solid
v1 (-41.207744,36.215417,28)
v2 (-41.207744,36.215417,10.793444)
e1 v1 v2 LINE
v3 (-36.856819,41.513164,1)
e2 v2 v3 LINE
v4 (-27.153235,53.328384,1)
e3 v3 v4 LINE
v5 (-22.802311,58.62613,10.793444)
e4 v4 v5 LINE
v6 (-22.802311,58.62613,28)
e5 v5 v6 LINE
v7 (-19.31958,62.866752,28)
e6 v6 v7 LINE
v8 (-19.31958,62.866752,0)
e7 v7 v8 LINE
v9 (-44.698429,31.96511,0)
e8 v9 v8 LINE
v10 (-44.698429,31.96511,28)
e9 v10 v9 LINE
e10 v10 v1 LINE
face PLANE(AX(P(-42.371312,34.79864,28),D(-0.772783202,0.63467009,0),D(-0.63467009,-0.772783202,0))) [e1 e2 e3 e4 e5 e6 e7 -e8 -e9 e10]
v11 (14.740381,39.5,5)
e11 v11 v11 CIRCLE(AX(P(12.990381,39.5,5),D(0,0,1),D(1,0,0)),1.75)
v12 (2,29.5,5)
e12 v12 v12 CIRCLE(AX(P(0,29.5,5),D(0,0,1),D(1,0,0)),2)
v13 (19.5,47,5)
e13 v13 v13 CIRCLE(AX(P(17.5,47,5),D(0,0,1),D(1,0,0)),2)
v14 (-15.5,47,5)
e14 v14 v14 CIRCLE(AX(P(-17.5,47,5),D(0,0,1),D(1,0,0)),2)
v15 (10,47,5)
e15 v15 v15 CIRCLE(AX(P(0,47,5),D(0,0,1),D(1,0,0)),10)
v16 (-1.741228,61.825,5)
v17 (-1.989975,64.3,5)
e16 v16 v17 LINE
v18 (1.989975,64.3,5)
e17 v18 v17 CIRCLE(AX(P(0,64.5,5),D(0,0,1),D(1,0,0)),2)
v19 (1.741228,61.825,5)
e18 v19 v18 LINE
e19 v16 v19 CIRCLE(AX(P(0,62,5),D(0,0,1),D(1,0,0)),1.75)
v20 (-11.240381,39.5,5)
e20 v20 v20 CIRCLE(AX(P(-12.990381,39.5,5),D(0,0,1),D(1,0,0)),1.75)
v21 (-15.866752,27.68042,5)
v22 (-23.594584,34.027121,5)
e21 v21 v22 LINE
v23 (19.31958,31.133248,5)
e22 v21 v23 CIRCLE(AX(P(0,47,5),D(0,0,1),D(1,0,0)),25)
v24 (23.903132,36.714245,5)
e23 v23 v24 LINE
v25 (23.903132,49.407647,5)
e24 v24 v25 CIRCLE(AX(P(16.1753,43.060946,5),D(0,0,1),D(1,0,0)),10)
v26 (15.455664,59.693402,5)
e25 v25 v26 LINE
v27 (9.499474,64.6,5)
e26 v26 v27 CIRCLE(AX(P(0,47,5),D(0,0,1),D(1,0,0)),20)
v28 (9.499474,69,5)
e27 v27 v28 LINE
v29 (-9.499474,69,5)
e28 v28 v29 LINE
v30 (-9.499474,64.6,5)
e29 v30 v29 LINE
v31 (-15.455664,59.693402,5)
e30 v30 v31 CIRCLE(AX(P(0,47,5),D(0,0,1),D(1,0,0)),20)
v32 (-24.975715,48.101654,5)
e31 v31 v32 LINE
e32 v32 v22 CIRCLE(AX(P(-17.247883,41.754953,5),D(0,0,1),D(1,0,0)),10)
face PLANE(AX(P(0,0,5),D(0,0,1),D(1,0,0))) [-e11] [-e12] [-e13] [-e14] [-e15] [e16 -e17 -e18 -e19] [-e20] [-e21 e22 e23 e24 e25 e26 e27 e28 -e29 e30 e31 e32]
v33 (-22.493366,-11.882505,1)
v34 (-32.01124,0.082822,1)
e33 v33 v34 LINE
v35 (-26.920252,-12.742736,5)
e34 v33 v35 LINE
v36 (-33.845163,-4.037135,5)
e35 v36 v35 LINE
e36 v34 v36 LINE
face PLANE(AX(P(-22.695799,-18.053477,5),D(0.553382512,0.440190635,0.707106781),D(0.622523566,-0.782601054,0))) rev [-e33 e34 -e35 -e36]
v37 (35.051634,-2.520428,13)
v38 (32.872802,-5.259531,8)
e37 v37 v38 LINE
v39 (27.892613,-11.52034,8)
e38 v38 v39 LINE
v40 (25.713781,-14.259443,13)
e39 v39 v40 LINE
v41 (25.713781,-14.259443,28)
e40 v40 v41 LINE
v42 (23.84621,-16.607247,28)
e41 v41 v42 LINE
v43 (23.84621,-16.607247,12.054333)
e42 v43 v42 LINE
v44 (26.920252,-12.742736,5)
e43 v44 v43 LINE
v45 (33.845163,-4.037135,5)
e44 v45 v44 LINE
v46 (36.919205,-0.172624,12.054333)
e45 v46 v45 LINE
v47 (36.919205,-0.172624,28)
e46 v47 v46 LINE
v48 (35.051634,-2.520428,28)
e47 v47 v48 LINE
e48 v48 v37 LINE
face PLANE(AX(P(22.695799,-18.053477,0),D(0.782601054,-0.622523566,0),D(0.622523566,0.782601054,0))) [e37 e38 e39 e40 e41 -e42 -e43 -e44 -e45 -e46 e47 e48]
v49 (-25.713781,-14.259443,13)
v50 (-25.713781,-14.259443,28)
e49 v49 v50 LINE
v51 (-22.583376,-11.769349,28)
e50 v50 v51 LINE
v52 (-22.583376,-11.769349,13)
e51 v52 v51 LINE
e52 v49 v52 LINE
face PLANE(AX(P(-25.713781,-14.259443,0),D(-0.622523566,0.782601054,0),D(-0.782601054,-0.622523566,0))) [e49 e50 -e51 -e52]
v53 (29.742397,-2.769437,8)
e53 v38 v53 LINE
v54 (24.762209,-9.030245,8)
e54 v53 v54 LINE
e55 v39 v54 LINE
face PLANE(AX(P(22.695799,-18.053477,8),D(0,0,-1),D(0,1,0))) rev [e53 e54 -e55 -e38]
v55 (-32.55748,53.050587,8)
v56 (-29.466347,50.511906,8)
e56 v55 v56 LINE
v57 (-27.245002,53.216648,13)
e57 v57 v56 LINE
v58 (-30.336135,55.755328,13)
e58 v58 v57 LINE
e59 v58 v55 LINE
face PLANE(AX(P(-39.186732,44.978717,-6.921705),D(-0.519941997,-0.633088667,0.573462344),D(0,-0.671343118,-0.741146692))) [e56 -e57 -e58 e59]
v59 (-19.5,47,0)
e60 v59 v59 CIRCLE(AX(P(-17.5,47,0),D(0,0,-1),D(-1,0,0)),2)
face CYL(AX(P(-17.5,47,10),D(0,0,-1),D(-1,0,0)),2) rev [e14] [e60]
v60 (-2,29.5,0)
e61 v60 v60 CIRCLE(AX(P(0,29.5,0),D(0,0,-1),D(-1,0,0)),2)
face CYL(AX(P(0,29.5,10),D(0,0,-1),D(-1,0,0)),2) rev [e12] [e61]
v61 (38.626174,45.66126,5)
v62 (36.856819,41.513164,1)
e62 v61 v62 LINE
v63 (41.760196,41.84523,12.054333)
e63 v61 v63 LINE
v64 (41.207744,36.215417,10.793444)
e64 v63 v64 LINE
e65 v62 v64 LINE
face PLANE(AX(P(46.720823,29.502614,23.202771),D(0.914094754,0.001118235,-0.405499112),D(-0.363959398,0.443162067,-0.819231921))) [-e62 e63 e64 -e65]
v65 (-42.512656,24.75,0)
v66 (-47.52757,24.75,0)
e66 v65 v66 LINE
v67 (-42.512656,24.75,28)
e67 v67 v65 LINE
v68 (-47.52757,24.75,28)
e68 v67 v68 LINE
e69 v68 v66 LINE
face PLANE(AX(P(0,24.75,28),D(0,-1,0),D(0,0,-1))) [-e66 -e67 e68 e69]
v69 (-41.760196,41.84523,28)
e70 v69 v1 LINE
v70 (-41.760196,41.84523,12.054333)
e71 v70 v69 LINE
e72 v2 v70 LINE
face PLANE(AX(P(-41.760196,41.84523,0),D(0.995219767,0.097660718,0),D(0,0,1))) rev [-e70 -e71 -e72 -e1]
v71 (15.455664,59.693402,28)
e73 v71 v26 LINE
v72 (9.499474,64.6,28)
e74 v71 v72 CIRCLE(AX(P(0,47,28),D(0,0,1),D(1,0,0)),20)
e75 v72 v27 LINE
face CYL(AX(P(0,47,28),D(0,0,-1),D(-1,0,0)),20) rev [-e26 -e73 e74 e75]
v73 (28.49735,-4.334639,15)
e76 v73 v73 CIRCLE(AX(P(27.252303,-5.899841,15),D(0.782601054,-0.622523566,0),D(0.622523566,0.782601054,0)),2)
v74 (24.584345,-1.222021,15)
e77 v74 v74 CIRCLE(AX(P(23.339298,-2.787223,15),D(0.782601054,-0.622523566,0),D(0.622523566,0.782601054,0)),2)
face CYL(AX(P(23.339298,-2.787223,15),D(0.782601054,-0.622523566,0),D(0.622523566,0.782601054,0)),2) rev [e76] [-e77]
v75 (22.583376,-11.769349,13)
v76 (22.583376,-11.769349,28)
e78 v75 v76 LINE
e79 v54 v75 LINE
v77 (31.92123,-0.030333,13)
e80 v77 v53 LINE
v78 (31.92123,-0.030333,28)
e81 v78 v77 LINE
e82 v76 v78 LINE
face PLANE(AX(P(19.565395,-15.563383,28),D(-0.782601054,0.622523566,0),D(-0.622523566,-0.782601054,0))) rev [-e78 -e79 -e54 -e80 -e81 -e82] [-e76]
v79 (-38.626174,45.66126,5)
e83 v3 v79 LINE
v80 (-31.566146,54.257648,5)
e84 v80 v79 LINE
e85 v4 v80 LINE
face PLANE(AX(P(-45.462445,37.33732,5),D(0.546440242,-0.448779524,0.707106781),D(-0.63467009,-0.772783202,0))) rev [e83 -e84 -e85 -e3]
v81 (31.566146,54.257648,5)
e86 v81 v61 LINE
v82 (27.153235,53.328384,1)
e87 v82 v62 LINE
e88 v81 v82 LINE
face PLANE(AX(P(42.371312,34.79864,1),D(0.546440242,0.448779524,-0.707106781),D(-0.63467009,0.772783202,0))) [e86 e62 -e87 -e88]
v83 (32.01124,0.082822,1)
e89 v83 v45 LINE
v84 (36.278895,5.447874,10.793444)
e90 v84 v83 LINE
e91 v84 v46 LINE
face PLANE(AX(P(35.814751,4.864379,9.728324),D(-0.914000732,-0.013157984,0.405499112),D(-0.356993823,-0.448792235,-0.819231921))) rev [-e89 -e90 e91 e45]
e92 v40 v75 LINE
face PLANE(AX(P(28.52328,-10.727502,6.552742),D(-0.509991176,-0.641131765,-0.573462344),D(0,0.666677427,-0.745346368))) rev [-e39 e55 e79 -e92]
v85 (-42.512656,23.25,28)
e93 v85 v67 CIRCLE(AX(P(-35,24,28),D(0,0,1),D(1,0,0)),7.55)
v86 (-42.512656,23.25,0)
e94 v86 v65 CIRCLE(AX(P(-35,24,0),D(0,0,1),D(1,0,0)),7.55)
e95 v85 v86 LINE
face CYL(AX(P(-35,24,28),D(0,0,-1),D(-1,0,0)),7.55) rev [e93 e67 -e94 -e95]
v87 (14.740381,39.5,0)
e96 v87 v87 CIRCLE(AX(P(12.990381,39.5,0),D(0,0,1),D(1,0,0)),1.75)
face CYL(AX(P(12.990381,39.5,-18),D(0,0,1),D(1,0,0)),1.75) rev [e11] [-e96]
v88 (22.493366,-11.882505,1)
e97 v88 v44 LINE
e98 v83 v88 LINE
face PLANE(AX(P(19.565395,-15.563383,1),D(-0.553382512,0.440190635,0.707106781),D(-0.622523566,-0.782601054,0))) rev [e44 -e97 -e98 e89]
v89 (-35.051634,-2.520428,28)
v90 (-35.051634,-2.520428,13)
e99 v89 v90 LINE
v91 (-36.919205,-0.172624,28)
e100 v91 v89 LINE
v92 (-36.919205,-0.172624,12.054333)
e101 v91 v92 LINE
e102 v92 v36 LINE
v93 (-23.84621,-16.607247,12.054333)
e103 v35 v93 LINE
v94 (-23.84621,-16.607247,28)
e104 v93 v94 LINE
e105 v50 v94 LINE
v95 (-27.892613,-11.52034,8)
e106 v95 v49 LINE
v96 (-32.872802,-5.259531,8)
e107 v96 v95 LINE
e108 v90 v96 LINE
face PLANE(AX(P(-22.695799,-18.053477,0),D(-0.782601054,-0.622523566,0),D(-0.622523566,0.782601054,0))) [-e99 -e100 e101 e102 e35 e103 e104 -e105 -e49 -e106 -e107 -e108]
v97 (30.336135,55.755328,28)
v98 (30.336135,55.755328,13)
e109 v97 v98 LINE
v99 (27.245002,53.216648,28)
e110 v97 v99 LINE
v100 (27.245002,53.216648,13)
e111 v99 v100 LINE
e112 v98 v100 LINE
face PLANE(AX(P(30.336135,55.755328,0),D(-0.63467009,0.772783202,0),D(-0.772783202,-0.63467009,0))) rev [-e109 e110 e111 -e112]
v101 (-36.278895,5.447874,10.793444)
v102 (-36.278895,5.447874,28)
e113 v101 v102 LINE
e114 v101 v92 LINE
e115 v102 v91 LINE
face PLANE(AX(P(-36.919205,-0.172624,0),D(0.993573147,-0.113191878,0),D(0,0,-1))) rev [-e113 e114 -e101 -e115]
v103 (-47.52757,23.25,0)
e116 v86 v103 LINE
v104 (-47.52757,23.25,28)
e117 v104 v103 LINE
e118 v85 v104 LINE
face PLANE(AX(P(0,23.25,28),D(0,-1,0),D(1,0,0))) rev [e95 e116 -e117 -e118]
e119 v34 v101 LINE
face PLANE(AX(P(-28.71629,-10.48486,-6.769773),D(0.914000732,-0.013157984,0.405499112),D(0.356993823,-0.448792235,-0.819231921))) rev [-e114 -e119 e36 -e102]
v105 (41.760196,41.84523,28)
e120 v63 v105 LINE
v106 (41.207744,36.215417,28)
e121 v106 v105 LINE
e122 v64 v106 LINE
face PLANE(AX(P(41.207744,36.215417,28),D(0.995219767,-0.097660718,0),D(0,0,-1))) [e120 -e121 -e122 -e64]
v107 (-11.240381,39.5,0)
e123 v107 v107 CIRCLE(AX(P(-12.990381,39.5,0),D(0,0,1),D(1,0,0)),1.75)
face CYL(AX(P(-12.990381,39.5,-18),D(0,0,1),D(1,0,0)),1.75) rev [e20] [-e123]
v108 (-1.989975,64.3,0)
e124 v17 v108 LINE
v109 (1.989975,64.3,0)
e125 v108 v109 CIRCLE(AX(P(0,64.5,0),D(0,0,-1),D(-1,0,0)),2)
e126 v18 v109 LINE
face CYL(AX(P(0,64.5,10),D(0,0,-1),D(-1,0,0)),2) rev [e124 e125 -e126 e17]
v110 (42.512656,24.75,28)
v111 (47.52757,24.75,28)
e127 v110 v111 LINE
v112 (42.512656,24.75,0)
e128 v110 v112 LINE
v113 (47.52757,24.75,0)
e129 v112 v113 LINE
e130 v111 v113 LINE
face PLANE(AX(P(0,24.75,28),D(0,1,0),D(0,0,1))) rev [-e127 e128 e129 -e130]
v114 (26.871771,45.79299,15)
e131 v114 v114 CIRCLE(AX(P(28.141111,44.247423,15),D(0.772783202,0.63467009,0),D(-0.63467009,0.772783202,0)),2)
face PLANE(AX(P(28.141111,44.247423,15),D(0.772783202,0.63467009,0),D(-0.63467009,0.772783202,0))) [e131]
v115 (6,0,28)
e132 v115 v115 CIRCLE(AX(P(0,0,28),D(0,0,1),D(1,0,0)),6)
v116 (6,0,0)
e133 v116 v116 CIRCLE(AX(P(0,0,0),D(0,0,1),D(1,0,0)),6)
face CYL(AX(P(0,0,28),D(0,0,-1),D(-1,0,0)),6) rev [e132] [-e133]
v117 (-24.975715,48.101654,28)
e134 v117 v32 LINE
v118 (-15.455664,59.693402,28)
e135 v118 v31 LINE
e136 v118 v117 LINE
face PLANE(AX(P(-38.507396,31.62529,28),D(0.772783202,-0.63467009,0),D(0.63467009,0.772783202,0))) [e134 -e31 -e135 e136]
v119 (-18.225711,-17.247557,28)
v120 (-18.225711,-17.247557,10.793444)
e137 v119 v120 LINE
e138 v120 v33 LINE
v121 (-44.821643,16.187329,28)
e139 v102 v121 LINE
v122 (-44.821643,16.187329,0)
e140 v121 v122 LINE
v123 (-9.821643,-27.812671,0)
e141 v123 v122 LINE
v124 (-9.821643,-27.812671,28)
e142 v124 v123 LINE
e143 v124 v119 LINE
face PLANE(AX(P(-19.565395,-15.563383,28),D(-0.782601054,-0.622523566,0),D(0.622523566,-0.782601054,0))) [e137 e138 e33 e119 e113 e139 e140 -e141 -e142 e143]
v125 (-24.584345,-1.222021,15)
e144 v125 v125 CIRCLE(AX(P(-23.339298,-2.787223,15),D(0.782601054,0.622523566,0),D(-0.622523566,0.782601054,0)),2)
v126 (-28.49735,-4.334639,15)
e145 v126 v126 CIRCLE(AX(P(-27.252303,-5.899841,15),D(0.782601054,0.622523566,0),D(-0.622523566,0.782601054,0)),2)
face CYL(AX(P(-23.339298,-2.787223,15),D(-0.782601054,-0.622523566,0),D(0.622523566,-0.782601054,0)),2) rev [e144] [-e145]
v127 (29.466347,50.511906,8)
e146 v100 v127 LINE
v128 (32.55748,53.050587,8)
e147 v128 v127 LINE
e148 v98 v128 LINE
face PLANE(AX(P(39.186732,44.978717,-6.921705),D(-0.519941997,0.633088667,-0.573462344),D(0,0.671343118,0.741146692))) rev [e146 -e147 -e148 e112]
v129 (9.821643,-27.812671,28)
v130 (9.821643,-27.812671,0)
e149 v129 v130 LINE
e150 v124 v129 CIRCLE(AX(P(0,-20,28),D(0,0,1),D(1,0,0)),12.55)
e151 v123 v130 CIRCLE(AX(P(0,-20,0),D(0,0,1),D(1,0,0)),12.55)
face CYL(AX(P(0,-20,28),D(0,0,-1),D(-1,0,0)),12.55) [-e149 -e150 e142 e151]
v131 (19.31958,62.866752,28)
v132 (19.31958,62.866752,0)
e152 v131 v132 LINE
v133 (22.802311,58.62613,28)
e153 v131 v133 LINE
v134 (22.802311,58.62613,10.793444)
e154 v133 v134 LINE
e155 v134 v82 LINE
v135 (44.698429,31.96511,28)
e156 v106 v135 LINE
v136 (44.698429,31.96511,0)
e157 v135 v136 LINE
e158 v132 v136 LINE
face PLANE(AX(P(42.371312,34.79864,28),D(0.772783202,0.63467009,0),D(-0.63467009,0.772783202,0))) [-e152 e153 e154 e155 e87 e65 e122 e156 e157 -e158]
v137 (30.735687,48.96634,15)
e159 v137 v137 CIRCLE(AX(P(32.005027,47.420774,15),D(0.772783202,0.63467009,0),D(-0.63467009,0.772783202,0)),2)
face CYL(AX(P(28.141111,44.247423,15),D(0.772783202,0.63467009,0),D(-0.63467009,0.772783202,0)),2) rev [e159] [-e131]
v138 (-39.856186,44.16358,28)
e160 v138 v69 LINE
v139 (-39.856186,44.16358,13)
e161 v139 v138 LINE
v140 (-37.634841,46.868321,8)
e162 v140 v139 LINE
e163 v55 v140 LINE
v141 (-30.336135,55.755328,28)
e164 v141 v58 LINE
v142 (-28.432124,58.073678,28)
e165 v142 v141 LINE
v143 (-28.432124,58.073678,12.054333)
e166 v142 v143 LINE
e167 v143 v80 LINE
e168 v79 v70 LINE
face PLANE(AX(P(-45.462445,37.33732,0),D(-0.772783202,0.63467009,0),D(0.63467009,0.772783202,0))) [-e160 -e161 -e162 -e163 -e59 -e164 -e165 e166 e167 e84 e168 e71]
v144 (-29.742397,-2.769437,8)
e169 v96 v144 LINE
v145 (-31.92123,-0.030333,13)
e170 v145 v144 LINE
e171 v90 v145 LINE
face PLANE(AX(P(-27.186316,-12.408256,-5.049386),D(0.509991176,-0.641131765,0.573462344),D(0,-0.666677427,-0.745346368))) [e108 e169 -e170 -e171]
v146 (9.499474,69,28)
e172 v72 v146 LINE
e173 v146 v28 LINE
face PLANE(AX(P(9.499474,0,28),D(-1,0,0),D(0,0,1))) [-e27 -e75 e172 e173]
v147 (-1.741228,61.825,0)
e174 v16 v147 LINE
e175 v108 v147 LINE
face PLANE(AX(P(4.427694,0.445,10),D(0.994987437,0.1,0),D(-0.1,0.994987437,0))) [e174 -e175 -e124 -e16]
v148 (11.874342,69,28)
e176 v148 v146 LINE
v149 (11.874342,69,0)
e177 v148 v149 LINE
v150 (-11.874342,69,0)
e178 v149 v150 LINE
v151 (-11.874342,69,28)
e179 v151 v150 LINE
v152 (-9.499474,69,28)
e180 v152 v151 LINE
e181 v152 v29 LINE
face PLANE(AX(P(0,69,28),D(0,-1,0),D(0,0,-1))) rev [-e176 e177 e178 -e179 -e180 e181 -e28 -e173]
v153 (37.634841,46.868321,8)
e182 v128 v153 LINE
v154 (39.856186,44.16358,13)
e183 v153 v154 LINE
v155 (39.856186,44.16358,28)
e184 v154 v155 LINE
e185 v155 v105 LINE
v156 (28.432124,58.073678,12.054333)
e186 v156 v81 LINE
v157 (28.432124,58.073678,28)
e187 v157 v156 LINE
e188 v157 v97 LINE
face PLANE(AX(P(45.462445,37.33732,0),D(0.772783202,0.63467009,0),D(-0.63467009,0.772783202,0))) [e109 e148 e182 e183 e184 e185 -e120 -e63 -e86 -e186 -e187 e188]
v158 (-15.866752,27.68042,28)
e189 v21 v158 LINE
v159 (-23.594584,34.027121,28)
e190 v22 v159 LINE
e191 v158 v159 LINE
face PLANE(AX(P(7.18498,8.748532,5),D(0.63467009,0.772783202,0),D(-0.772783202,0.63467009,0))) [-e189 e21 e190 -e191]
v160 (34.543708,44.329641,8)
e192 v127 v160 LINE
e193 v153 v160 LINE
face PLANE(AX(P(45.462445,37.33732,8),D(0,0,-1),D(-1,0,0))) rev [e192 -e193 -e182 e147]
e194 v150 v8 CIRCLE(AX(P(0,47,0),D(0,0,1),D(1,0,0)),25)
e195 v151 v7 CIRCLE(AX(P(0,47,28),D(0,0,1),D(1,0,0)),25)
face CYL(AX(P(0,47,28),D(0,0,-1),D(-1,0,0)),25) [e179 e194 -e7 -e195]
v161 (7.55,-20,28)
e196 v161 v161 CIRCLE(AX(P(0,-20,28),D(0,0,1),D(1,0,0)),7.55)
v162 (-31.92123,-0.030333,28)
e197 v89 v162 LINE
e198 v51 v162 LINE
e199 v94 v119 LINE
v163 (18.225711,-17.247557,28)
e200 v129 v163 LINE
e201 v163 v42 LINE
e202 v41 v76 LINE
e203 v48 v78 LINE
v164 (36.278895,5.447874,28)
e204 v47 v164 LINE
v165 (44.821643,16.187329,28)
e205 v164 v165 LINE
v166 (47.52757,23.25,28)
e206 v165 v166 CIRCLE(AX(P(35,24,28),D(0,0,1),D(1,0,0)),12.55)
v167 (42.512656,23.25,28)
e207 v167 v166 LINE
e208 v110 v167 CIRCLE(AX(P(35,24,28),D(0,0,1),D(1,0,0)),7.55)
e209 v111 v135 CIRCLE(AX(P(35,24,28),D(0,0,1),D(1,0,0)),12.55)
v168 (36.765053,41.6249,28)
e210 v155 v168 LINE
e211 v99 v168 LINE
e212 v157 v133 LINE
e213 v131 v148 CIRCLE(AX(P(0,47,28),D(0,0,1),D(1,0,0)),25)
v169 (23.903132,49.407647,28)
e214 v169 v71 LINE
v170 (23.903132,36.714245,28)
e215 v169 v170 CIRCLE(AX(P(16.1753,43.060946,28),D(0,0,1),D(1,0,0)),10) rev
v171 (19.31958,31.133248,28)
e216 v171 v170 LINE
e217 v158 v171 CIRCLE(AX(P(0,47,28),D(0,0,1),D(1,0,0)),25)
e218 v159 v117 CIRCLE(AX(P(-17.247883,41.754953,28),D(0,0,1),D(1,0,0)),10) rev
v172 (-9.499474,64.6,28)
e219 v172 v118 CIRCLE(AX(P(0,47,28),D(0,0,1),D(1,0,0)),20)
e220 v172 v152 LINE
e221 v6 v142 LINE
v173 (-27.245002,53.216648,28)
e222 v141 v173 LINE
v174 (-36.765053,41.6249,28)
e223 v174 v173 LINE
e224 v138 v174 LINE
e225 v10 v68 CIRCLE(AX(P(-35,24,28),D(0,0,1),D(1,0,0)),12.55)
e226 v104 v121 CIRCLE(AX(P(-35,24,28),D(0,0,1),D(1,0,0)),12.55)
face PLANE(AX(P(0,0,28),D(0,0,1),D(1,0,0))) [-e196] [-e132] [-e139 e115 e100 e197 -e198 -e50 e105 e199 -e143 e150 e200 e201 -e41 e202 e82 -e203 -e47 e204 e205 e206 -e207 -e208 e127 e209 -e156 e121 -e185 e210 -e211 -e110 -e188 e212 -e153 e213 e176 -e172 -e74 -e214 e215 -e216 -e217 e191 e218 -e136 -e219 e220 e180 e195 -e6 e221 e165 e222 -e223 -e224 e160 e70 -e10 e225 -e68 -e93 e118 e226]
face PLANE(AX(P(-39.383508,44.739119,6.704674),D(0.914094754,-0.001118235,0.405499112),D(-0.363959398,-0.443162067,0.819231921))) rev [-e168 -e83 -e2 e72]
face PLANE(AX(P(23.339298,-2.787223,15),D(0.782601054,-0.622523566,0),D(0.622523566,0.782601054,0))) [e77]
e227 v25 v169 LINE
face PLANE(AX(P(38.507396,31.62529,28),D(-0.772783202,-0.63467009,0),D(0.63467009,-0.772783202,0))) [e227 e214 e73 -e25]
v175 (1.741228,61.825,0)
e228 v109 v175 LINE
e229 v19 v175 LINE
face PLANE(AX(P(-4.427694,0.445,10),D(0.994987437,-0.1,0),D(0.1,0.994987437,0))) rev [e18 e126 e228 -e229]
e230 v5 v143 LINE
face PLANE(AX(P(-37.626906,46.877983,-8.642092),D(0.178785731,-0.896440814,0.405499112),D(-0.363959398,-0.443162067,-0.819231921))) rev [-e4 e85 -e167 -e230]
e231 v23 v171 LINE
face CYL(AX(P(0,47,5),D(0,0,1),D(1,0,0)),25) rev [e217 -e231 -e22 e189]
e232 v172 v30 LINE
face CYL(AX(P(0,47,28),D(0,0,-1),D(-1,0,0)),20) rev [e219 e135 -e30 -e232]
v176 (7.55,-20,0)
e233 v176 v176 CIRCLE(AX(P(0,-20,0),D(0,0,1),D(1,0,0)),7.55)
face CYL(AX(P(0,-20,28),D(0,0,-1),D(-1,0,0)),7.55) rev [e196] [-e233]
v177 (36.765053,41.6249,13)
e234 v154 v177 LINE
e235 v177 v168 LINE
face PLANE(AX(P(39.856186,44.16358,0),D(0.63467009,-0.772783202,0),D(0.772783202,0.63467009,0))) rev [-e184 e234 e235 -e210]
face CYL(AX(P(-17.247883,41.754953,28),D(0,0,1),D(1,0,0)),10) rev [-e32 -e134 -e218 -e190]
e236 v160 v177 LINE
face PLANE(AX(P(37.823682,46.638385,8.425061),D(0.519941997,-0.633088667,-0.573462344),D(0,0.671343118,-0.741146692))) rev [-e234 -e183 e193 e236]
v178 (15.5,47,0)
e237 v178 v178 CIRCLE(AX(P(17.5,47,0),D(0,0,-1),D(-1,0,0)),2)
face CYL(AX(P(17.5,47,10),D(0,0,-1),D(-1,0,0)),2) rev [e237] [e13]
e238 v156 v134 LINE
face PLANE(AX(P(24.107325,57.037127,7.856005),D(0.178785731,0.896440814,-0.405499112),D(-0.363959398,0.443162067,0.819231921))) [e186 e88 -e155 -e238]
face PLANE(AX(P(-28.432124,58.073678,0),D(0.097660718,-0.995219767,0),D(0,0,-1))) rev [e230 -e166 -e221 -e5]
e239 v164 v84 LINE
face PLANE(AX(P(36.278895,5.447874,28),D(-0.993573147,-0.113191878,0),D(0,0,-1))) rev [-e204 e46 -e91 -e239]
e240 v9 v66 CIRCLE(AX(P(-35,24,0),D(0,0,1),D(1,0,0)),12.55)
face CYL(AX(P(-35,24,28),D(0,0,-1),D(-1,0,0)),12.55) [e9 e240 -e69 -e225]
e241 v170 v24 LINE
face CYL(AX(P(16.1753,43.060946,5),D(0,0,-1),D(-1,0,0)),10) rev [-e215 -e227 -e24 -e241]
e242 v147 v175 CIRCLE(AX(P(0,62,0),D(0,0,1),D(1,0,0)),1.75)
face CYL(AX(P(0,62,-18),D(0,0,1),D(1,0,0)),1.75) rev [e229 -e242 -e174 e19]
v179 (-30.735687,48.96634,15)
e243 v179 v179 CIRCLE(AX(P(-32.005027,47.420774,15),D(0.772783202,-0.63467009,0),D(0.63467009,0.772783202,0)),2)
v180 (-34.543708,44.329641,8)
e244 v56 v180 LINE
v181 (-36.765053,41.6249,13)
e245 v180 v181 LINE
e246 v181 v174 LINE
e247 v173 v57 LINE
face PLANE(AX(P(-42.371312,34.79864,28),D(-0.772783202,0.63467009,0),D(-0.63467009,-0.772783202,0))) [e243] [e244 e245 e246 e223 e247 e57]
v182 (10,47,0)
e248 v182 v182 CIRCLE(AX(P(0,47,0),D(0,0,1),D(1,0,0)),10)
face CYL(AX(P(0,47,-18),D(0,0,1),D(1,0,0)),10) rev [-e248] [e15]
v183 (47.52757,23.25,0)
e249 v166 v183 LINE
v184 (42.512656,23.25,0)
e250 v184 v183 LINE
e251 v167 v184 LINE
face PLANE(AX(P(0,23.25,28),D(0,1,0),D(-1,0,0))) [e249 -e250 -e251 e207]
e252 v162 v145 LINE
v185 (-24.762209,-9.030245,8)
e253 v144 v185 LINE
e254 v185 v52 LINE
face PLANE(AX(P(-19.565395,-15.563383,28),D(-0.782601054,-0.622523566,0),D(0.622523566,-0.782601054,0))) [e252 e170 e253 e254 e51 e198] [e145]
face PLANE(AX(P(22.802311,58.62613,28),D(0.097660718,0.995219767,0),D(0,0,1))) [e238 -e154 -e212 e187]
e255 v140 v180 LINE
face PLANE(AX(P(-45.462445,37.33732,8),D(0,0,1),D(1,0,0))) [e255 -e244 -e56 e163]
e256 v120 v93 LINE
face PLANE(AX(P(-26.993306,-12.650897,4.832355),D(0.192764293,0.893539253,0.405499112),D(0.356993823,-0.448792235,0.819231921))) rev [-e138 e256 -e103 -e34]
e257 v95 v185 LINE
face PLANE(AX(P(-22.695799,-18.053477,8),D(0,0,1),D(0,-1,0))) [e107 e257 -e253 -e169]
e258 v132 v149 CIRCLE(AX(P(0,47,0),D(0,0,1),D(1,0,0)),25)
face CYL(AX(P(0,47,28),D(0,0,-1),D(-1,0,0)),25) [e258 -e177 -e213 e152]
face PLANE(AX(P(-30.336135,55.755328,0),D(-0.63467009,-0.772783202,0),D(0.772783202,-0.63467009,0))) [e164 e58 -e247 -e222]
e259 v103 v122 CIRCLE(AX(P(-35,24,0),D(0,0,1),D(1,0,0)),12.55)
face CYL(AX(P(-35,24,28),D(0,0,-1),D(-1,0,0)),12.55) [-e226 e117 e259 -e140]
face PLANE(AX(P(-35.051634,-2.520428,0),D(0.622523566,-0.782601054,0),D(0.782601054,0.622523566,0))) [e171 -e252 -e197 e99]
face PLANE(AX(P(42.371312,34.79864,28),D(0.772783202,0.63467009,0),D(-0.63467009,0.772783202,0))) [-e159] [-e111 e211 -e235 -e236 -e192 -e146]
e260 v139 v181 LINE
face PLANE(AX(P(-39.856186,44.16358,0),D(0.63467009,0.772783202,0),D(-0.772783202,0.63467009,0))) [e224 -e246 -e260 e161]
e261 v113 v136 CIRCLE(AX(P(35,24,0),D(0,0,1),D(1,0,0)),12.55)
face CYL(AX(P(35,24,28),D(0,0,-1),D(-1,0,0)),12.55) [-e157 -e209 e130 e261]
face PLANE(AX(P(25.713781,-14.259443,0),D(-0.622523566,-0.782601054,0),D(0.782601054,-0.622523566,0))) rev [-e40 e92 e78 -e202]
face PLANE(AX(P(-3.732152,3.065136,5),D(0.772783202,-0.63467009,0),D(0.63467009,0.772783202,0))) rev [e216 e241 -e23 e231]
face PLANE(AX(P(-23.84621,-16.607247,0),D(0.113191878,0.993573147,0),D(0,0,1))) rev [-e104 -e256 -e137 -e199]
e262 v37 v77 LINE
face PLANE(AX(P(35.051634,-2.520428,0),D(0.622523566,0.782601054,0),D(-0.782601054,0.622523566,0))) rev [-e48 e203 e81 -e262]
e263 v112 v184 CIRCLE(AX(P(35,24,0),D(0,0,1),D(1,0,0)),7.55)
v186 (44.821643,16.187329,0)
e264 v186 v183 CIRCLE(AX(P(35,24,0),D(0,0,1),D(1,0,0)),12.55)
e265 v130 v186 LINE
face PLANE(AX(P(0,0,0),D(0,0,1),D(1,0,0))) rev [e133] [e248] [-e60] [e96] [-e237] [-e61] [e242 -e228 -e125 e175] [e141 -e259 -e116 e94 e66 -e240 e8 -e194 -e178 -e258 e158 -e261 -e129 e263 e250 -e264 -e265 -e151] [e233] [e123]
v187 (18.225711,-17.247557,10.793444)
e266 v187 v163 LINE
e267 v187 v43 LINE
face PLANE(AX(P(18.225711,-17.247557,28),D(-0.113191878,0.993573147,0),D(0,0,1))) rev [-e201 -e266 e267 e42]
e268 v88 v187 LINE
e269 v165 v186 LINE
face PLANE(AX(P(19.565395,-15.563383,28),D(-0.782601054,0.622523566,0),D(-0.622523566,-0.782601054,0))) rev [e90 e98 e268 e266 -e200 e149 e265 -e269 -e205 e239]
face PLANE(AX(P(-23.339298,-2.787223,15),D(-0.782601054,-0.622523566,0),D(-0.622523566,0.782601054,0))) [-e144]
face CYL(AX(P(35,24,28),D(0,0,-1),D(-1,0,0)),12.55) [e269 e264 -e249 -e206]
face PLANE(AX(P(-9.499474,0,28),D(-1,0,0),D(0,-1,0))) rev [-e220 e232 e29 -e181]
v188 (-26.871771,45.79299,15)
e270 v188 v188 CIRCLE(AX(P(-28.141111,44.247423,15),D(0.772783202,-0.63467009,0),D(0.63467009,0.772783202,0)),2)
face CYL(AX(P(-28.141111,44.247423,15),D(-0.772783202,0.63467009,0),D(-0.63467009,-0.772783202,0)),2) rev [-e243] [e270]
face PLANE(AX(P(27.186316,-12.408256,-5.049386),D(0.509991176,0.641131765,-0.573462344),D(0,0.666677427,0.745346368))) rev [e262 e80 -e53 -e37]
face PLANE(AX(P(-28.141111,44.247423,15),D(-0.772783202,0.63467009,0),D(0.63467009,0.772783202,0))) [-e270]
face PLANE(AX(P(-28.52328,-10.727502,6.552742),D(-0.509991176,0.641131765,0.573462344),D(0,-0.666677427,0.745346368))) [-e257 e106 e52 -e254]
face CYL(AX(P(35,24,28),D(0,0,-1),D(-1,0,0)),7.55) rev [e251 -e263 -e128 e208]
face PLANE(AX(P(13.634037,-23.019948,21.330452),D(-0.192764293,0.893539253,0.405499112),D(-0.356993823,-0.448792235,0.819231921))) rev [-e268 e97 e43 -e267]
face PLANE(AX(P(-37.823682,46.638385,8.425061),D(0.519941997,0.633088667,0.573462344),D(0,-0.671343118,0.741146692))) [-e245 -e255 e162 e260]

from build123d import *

# Parameters (mm, degrees)
SZKIC1_R                    = 7.550000000001571
SZKIC1_R_2                  = 6.000000000000003
DODANIE_WYCI_GNI_CIE1_DEPTH = 28
WYTNIJ_WYCI_GNI_CIE1_START  = -23
WYTNIJ_WYCI_GNI_CIE1_DEPTH  = 23
SZKIC3_R                    = 10.000000000000002
SZKIC3_R_2                  = 1.7500000000000033
SZKIC3_R_3                  = 1.7500000000000069
SZKIC3_R_4                  = 1.750000000000002
WYTNIJ_WYCI_GNI_CIE2_DEPTH  = 23
DODANIE_WYCI_GNI_CIE2_DEPTH = 23
ZAOKR_GLENIE2_R             = 10
WYTNIJ_WYCI_GNI_CIE3_START  = -10
SZKIC5_R                    = 2.000000000000005
SZKIC5_R_2                  = 2.0000000000000036
SZKIC5_R_3                  = 2.000000000000003
SZKIC5_R_4                  = 1.9999999999999971
SZKIC5_R_5                  = 1.7500000000000033
WYTNIJ_WYCI_GNI_CIE3_DEPTH  = 10
DODANIE_WYCI_GNI_CIE3_DEPTH = 4
SFAZOWANIE1_SIZE            = 4
DODANIE_WYCI_GNI_CIE4_DEPTH = 4
SFAZOWANIE2_SIZE            = 4
SZKIC8_R                    = 2.0000000000000018
WYTNIJ_WYCI_GNI_CIE4_DEPTH  = 5
SZKIC9_R                    = 1.9999999999999996
WYTNIJ_WYCI_GNI_CIE5_DEPTH  = 5
SFAZOWANIE3_SIZE            = 4


with BuildPart() as part:
    # Szkic1 → Dodanie-wyciągnięcie1 (new body)
    with BuildSketch(Plane.XY):
        with BuildLine():
            Line((-19.31958004687979, 62.866752245251845), (-44.69842918353365, 31.96510962711642))
            ThreePointArc((-44.69842918353365, 31.96510962711642), (-46.68388664689503, 28.581407297164034), (-47.527569596693525, 24.749999999999982))
            Line((-47.52756959669351, 24.74999999999998), (-42.512655988397164, 24.74999999999998))
            ThreePointArc((-42.51265598839718, 24.74999999999998), (-27.44999999999999, 24.000000000000014), (-42.51265598839717, 23.249999999999975))
            Line((-42.512655988397164, 23.24999999999998), (-47.52756959669352, 23.249999999999982))
            ThreePointArc((-47.52756959669352, 23.249999999999982), (-46.71930706256188, 19.509973054269363), (-44.82164322990438, 16.187329248939687))
            Line((-44.82164322990438, 16.18732924893969), (-9.82164322990438, -27.81267075106031))
            ThreePointArc((-9.82164322990438, -27.81267075106031), (8.21e-15, -32.55), (9.821643229904398, -27.81267075106031))
            Line((9.821643229904394, -27.812670751060306), (44.82164322990439, 16.187329248939694))
            ThreePointArc((44.82164322990438, 16.18732924893969), (46.71930706256188, 19.509973054269366), (47.52756959669352, 23.249999999999986))
            Line((47.52756959669352, 23.249999999999993), (42.512655988397164, 23.24999999999999))
            ThreePointArc((42.51265598839717, 23.249999999999986), (27.44999999999999, 24.00000000000001), (42.51265598839718, 24.74999999999999))
            Line((42.512655988397164, 24.74999999999999), (47.52756959669351, 24.74999999999999))
            ThreePointArc((47.52756959669352, 24.74999999999999), (46.68388664689503, 28.581407297164038), (44.69842918353365, 31.965109627116423))
            Line((44.698429183533655, 31.965109627116426), (19.319580046879793, 62.866752245251845))
            ThreePointArc((19.319580046879786, 62.866752245251845), (15.895577263173283, 66.29587063261175), (11.874342087037947, 68.99999999999999))
            Line((11.874342087037945, 68.99999999999999), (-11.874342087037945, 68.99999999999999))
            ThreePointArc((-11.87434208703795, 68.99999999999999), (-15.895577263173287, 66.29587063261175), (-19.31958004687979, 62.866752245251845))
        make_face()
        with Locations((-6.187e-14, -19.99999999999843)):
            Circle(SZKIC1_R, mode=Mode.SUBTRACT)
        Circle(SZKIC1_R_2, mode=Mode.SUBTRACT)
    extrude(amount=DODANIE_WYCI_GNI_CIE1_DEPTH)

    # Szkic2 → Wytnij-wyciągnięcie1 (cut)
    with BuildSketch(Plane.XY.offset(28).offset(WYTNIJ_WYCI_GNI_CIE1_START)):
        with BuildLine():
            Line((32.35059967573885, 47), (19.319580046879782, 62.866752245251845))
            ThreePointArc((19.319580046879782, 62.866752245251845), (15.89557726317328, 66.29587063261175), (11.874342087037947, 68.99999999999997))
            Line((11.874342087037945, 68.99999999999999), (-11.874342087037942, 68.99999999999999))
            ThreePointArc((-11.87434208703794, 68.99999999999999), (-15.895577263173282, 66.29587063261175), (-19.319580046879786, 62.86675224525184))
            Line((-19.31958004687979, 62.866752245251845), (-35.18633229213164, 43.54717219837204))
            Line((-35.18633229213164, 43.54717219837204), (-15.866752245251844, 27.680419953120204))
            ThreePointArc((-15.866752245251835, 27.680419953120207), (2.441517952800565, 22.11950583115053), (19.31958004687979, 31.13324775474816))
            Line((19.319580046879796, 31.133247754748155), (32.35059967573885, 47))
        make_face()
    extrude(amount=WYTNIJ_WYCI_GNI_CIE1_DEPTH, mode=Mode.SUBTRACT)

    # Szkic3 → Wytnij-wyciągnięcie2 (cut)
    with BuildSketch(Plane.XY.offset(5.000000000000001)):
        with Locations((0, 47)):
            Circle(SZKIC3_R)
        with Locations((0, 62)):
            Circle(SZKIC3_R_2)
        with Locations((12.990381056766878, 39.50000000000017)):
            Circle(SZKIC3_R_3)
        with Locations((-12.990381056766289, 39.49999999999982)):
            Circle(SZKIC3_R_4)
    extrude(amount=-WYTNIJ_WYCI_GNI_CIE2_DEPTH, mode=Mode.SUBTRACT)

    # Szkic4 → Dodanie-wyciągnięcie2 (add)
    with BuildSketch(Plane.XY.offset(5.000000000000001)):
        with BuildLine():
            Line((-9.499473669630353, 64.6), (-9.499473669630355, 69))
            Line((-9.499473669630355, 68.99999999999999), (-11.874342087037942, 68.99999999999999))
            ThreePointArc((-11.874342087037942, 68.99999999999999), (-15.895577263173275, 66.29587063261174), (-19.319580046879786, 62.866752245251845))
            Line((-19.31958004687979, 62.866752245251845), (-35.18633229213164, 43.54717219837204))
            Line((-35.18633229213164, 43.54717219837204), (-31.322416282755675, 40.37382174932167))
            Line((-31.322416282755682, 40.373821749321664), (-15.45566403750383, 59.69340179620147))
            ThreePointArc((-15.45566403750383, 59.69340179620147), (-12.716461810538625, 62.436696506089405), (-9.499473669630351, 64.6))
        make_face()
        with BuildLine():
            Line((29.115539708164945, 43.06094561546435), (32.350599675738835, 47))
            Line((32.350599675738835, 47), (19.319580046879796, 62.866752245251845))
            ThreePointArc((19.319580046879793, 62.866752245251845), (15.895577263173287, 66.29587063261175), (11.874342087037945, 68.99999999999999))
            Line((11.874342087037945, 68.99999999999999), (9.499473669630357, 68.99999999999999))
            Line((9.499473669630357, 69), (9.499473669630357, 64.6))
            ThreePointArc((9.499473669630355, 64.6), (12.716461810538629, 62.436696506089405), (15.455664037503837, 59.69340179620148))
            Line((15.455664037503837, 59.69340179620148), (28.48668366636287, 43.82664955094963))
            Line((28.48668366636287, 43.82664955094963), (29.115539708164945, 43.06094561546435))
        make_face()
    extrude(amount=DODANIE_WYCI_GNI_CIE2_DEPTH)

    # Zaokrąglenie2
    zaokr_glenie2_edges = [part.edges().sort_by_distance(p)[0] for p in [
        (-31.32241628275568, 40.373821749321664, 16.5),
        (29.115539708164945, 43.06094561546435, 16.5),
    ]]
    fillet(zaokr_glenie2_edges, radius=ZAOKR_GLENIE2_R)

    # Szkic5 → Wytnij-wyciągnięcie3 (cut)
    with BuildSketch(Plane(origin=(0, 0, 0), x_dir=(-1, 0, 0), z_dir=(0, 0, -1)).offset(WYTNIJ_WYCI_GNI_CIE3_START)):
        with Locations((-17.5, 47.00000000000005)):
            Circle(SZKIC5_R)
        with Locations((17.5, 46.99999999999994)):
            Circle(SZKIC5_R_2)
        with Locations((-4.684e-14, 29.5)):
            Circle(SZKIC5_R_3)
        with Locations((5.896e-14, 64.5)):
            Circle(SZKIC5_R_4)
        with Locations((0, 62)):
            Circle(SZKIC5_R_5)
        with BuildLine():
            ThreePointArc((-1.3905372163304106, 63.062500000000036), (-1.7999491829154104, 63.6281152949375), (-1.9899748742131833, 64.30000000000005))
            Line((-1.9899748742131869, 64.30000000000005), (-1.7412280149365922, 61.82500000000004))
            ThreePointArc((-1.7412280149365924, 61.82500000000004), (-1.683698289018324, 62.47713737178802), (-1.3905372163304301, 63.062500000000014))
        make_face()
        with BuildLine():
            ThreePointArc((1.7500000000000036, 62), (1.7478056279430847, 61.91239014364529), (1.7412280149365837, 61.82499999999995))
            Line((1.741228014936584, 61.82499999999995), (1.989974874213301, 64.30000000000005))
            ThreePointArc((1.9899748742133014, 64.30000000000005), (1.7999491829155065, 63.62811529493745), (1.3905372163304575, 63.062499999999964))
            ThreePointArc((1.3905372163304832, 63.06249999999994), (1.6577002335432005, 62.56082968511914), (1.7500000000000036, 62))
        make_face()
    extrude(amount=WYTNIJ_WYCI_GNI_CIE3_DEPTH, mode=Mode.SUBTRACT)

    # Szkic6 → Dodanie-wyciągnięcie3 (add)
    with BuildSketch(Plane(origin=(42.37131210135847, 34.798640021529614, 0), x_dir=(0, 0, -1), z_dir=(0.7727832018751915, 0.6346700898100739, 0))):
        Polygon((-28.000000000000004, 26.833343701652026), (-28.000000000000004, 23.833343701652026), (-13.000000000000002, 23.833343701652026), (-8, 20.333343701652034), (-8, 12.333343701652028), (-13.000000000000002, 8.83334370165203), (-28, 8.833343701652032), (-28, 5.83334370165203), (-12.0543333075427, 5.83334370165203), (-5, 10.771377016931917), (-5, 21.895310386372145), (-12.0543333075427, 26.833343701652026), align=None)
    dodanie_wyci_gni_cie3 = extrude(amount=DODANIE_WYCI_GNI_CIE3_DEPTH)

    # Sfazowanie1
    sfazowanie1_edges = [part.edges().sort_by_distance(p)[0] for p in [
        (25.3409914443264, 55.53499728430977, 20.027166653771353),
        (26.908002468173308, 53.62698268613559, 8.52716665377135),
        (32.00502738733217, 47.42077366462026, 5),
        (37.10205230649103, 41.21456464310493, 8.52716665377135),
        (38.66906333033795, 39.30655004493075, 20.02716665377135),
    ]]
    chamfer(sfazowanie1_edges, length=SFAZOWANIE1_SIZE - 0.0001)  # a hair under: the kernel refuses the full size

    # Szkic7 → Dodanie-wyciągnięcie4 (add)
    with BuildSketch(Plane(origin=(19.565395207126798, -15.563382551123588, 0), x_dir=(0, 0, -1), z_dir=(0.7826010541756485, -0.6225235658215388, 0))):
        Polygon((-28, 22.84797891648703), (-28, 19.84797891648703), (-13.000000000000002, 19.84797891648703), (-8, 16.34797891648703), (-8, 8.347978916487031), (-13.000000000000002, 4.8479789164870315), (-28, 4.847978916487031), (-28, 1.8479789164870304), (-12.0543333075427, 1.8479789164870304), (-5, 6.78601223176692), (-5, 17.909945601207145), (-12.054333307542692, 22.84797891648703), align=None)
    dodanie_wyci_gni_cie4 = extrude(amount=DODANIE_WYCI_GNI_CIE4_DEPTH)

    # Sfazowanie2
    sfazowanie2_edges = [part.edges().sort_by_distance(p)[0] for p in [
        (20.71580563178133, -14.117152302986465, 20.02716665377135),
        (22.252826685568124, -12.184897263940208, 8.52716665377135),
        (27.252303072907488, -5.899841234142155, 5),
        (32.251779460246844, 0.3852147956558962, 8.527166653771346),
        (33.78880051403364, 2.317469834702152, 20.027166653771346),
    ]]
    chamfer(sfazowanie2_edges, length=SFAZOWANIE2_SIZE - 0.0001)  # a hair under: the kernel refuses the full size

    # Szkic8 → Wytnij-wyciągnięcie4 (cut)
    with BuildSketch(Plane(origin=(42.37131210135847, 34.798640021529614, 0), x_dir=(0, 0, -1), z_dir=(0.7727832018751915, 0.6346700898100739, 0))):
        with Locations(Location((-15, 16.333343701652037, 0), (0, 0, 90))):
            Circle(SZKIC8_R)
    wytnij_wyci_gni_cie4 = extrude(amount=-WYTNIJ_WYCI_GNI_CIE4_DEPTH, mode=Mode.SUBTRACT)

    # Szkic9 → Wytnij-wyciągnięcie5 (cut)
    with BuildSketch(Plane(origin=(19.565395207126798, -15.563382551123588, 0), x_dir=(0, 0, -1), z_dir=(0.7826010541756485, -0.6225235658215388, 0))):
        with Locations(Location((-15, 12.347978916487023, 0), (0, 0, 90))):
            Circle(SZKIC9_R)
    wytnij_wyci_gni_cie5 = extrude(amount=-WYTNIJ_WYCI_GNI_CIE5_DEPTH, mode=Mode.SUBTRACT)

    # Lustro3: Dodanie-wyciągnięcie3, Dodanie-wyciągnięcie4, Wytnij-wyciągnięcie4, Wytnij-wyciągnięcie5 across plane
    add(dodanie_wyci_gni_cie3.mirror(Plane(origin=(0, 0, 0), x_dir=(0, 0, 1), z_dir=(1, 0, 0))))
    add(dodanie_wyci_gni_cie4.mirror(Plane(origin=(0, 0, 0), x_dir=(0, 0, 1), z_dir=(1, 0, 0))))
    add(wytnij_wyci_gni_cie4.mirror(Plane(origin=(0, 0, 0), x_dir=(0, 0, 1), z_dir=(1, 0, 0))), mode=Mode.SUBTRACT)
    add(wytnij_wyci_gni_cie5.mirror(Plane(origin=(0, 0, 0), x_dir=(0, 0, 1), z_dir=(1, 0, 0))), mode=Mode.SUBTRACT)

    # Sfazowanie3
    sfazowanie3_edges = [part.edges().sort_by_distance(p)[0] for p in [
        (-25.340991444326406, 55.534997284309775, 20.027166653771353),
        (-26.908002468173336, 53.6269826861356, 8.52716665377135),
        (-32.00502738733219, 47.42077366462027, 5),
        (-37.102052306491046, 41.214564643104936, 8.52716665377135),
        (-38.66906333033795, 39.30655004493076, 20.02716665377135),
        (-33.78880051403364, 2.317469834702152, 20.027166653771346),
        (-32.25177946024685, 0.3852147956558962, 8.527166653771346),
        (-27.25230307290748, -5.899841234142151, 5),
        (-22.252826685568124, -12.184897263940208, 8.527166653771351),
        (-20.71580563178133, -14.117152302986465, 20.02716665377135),
    ]]
    chamfer(sfazowanie3_edges, length=SFAZOWANIE3_SIZE - 0.0001)  # a hair under: the kernel refuses the full size


solid = part.part
